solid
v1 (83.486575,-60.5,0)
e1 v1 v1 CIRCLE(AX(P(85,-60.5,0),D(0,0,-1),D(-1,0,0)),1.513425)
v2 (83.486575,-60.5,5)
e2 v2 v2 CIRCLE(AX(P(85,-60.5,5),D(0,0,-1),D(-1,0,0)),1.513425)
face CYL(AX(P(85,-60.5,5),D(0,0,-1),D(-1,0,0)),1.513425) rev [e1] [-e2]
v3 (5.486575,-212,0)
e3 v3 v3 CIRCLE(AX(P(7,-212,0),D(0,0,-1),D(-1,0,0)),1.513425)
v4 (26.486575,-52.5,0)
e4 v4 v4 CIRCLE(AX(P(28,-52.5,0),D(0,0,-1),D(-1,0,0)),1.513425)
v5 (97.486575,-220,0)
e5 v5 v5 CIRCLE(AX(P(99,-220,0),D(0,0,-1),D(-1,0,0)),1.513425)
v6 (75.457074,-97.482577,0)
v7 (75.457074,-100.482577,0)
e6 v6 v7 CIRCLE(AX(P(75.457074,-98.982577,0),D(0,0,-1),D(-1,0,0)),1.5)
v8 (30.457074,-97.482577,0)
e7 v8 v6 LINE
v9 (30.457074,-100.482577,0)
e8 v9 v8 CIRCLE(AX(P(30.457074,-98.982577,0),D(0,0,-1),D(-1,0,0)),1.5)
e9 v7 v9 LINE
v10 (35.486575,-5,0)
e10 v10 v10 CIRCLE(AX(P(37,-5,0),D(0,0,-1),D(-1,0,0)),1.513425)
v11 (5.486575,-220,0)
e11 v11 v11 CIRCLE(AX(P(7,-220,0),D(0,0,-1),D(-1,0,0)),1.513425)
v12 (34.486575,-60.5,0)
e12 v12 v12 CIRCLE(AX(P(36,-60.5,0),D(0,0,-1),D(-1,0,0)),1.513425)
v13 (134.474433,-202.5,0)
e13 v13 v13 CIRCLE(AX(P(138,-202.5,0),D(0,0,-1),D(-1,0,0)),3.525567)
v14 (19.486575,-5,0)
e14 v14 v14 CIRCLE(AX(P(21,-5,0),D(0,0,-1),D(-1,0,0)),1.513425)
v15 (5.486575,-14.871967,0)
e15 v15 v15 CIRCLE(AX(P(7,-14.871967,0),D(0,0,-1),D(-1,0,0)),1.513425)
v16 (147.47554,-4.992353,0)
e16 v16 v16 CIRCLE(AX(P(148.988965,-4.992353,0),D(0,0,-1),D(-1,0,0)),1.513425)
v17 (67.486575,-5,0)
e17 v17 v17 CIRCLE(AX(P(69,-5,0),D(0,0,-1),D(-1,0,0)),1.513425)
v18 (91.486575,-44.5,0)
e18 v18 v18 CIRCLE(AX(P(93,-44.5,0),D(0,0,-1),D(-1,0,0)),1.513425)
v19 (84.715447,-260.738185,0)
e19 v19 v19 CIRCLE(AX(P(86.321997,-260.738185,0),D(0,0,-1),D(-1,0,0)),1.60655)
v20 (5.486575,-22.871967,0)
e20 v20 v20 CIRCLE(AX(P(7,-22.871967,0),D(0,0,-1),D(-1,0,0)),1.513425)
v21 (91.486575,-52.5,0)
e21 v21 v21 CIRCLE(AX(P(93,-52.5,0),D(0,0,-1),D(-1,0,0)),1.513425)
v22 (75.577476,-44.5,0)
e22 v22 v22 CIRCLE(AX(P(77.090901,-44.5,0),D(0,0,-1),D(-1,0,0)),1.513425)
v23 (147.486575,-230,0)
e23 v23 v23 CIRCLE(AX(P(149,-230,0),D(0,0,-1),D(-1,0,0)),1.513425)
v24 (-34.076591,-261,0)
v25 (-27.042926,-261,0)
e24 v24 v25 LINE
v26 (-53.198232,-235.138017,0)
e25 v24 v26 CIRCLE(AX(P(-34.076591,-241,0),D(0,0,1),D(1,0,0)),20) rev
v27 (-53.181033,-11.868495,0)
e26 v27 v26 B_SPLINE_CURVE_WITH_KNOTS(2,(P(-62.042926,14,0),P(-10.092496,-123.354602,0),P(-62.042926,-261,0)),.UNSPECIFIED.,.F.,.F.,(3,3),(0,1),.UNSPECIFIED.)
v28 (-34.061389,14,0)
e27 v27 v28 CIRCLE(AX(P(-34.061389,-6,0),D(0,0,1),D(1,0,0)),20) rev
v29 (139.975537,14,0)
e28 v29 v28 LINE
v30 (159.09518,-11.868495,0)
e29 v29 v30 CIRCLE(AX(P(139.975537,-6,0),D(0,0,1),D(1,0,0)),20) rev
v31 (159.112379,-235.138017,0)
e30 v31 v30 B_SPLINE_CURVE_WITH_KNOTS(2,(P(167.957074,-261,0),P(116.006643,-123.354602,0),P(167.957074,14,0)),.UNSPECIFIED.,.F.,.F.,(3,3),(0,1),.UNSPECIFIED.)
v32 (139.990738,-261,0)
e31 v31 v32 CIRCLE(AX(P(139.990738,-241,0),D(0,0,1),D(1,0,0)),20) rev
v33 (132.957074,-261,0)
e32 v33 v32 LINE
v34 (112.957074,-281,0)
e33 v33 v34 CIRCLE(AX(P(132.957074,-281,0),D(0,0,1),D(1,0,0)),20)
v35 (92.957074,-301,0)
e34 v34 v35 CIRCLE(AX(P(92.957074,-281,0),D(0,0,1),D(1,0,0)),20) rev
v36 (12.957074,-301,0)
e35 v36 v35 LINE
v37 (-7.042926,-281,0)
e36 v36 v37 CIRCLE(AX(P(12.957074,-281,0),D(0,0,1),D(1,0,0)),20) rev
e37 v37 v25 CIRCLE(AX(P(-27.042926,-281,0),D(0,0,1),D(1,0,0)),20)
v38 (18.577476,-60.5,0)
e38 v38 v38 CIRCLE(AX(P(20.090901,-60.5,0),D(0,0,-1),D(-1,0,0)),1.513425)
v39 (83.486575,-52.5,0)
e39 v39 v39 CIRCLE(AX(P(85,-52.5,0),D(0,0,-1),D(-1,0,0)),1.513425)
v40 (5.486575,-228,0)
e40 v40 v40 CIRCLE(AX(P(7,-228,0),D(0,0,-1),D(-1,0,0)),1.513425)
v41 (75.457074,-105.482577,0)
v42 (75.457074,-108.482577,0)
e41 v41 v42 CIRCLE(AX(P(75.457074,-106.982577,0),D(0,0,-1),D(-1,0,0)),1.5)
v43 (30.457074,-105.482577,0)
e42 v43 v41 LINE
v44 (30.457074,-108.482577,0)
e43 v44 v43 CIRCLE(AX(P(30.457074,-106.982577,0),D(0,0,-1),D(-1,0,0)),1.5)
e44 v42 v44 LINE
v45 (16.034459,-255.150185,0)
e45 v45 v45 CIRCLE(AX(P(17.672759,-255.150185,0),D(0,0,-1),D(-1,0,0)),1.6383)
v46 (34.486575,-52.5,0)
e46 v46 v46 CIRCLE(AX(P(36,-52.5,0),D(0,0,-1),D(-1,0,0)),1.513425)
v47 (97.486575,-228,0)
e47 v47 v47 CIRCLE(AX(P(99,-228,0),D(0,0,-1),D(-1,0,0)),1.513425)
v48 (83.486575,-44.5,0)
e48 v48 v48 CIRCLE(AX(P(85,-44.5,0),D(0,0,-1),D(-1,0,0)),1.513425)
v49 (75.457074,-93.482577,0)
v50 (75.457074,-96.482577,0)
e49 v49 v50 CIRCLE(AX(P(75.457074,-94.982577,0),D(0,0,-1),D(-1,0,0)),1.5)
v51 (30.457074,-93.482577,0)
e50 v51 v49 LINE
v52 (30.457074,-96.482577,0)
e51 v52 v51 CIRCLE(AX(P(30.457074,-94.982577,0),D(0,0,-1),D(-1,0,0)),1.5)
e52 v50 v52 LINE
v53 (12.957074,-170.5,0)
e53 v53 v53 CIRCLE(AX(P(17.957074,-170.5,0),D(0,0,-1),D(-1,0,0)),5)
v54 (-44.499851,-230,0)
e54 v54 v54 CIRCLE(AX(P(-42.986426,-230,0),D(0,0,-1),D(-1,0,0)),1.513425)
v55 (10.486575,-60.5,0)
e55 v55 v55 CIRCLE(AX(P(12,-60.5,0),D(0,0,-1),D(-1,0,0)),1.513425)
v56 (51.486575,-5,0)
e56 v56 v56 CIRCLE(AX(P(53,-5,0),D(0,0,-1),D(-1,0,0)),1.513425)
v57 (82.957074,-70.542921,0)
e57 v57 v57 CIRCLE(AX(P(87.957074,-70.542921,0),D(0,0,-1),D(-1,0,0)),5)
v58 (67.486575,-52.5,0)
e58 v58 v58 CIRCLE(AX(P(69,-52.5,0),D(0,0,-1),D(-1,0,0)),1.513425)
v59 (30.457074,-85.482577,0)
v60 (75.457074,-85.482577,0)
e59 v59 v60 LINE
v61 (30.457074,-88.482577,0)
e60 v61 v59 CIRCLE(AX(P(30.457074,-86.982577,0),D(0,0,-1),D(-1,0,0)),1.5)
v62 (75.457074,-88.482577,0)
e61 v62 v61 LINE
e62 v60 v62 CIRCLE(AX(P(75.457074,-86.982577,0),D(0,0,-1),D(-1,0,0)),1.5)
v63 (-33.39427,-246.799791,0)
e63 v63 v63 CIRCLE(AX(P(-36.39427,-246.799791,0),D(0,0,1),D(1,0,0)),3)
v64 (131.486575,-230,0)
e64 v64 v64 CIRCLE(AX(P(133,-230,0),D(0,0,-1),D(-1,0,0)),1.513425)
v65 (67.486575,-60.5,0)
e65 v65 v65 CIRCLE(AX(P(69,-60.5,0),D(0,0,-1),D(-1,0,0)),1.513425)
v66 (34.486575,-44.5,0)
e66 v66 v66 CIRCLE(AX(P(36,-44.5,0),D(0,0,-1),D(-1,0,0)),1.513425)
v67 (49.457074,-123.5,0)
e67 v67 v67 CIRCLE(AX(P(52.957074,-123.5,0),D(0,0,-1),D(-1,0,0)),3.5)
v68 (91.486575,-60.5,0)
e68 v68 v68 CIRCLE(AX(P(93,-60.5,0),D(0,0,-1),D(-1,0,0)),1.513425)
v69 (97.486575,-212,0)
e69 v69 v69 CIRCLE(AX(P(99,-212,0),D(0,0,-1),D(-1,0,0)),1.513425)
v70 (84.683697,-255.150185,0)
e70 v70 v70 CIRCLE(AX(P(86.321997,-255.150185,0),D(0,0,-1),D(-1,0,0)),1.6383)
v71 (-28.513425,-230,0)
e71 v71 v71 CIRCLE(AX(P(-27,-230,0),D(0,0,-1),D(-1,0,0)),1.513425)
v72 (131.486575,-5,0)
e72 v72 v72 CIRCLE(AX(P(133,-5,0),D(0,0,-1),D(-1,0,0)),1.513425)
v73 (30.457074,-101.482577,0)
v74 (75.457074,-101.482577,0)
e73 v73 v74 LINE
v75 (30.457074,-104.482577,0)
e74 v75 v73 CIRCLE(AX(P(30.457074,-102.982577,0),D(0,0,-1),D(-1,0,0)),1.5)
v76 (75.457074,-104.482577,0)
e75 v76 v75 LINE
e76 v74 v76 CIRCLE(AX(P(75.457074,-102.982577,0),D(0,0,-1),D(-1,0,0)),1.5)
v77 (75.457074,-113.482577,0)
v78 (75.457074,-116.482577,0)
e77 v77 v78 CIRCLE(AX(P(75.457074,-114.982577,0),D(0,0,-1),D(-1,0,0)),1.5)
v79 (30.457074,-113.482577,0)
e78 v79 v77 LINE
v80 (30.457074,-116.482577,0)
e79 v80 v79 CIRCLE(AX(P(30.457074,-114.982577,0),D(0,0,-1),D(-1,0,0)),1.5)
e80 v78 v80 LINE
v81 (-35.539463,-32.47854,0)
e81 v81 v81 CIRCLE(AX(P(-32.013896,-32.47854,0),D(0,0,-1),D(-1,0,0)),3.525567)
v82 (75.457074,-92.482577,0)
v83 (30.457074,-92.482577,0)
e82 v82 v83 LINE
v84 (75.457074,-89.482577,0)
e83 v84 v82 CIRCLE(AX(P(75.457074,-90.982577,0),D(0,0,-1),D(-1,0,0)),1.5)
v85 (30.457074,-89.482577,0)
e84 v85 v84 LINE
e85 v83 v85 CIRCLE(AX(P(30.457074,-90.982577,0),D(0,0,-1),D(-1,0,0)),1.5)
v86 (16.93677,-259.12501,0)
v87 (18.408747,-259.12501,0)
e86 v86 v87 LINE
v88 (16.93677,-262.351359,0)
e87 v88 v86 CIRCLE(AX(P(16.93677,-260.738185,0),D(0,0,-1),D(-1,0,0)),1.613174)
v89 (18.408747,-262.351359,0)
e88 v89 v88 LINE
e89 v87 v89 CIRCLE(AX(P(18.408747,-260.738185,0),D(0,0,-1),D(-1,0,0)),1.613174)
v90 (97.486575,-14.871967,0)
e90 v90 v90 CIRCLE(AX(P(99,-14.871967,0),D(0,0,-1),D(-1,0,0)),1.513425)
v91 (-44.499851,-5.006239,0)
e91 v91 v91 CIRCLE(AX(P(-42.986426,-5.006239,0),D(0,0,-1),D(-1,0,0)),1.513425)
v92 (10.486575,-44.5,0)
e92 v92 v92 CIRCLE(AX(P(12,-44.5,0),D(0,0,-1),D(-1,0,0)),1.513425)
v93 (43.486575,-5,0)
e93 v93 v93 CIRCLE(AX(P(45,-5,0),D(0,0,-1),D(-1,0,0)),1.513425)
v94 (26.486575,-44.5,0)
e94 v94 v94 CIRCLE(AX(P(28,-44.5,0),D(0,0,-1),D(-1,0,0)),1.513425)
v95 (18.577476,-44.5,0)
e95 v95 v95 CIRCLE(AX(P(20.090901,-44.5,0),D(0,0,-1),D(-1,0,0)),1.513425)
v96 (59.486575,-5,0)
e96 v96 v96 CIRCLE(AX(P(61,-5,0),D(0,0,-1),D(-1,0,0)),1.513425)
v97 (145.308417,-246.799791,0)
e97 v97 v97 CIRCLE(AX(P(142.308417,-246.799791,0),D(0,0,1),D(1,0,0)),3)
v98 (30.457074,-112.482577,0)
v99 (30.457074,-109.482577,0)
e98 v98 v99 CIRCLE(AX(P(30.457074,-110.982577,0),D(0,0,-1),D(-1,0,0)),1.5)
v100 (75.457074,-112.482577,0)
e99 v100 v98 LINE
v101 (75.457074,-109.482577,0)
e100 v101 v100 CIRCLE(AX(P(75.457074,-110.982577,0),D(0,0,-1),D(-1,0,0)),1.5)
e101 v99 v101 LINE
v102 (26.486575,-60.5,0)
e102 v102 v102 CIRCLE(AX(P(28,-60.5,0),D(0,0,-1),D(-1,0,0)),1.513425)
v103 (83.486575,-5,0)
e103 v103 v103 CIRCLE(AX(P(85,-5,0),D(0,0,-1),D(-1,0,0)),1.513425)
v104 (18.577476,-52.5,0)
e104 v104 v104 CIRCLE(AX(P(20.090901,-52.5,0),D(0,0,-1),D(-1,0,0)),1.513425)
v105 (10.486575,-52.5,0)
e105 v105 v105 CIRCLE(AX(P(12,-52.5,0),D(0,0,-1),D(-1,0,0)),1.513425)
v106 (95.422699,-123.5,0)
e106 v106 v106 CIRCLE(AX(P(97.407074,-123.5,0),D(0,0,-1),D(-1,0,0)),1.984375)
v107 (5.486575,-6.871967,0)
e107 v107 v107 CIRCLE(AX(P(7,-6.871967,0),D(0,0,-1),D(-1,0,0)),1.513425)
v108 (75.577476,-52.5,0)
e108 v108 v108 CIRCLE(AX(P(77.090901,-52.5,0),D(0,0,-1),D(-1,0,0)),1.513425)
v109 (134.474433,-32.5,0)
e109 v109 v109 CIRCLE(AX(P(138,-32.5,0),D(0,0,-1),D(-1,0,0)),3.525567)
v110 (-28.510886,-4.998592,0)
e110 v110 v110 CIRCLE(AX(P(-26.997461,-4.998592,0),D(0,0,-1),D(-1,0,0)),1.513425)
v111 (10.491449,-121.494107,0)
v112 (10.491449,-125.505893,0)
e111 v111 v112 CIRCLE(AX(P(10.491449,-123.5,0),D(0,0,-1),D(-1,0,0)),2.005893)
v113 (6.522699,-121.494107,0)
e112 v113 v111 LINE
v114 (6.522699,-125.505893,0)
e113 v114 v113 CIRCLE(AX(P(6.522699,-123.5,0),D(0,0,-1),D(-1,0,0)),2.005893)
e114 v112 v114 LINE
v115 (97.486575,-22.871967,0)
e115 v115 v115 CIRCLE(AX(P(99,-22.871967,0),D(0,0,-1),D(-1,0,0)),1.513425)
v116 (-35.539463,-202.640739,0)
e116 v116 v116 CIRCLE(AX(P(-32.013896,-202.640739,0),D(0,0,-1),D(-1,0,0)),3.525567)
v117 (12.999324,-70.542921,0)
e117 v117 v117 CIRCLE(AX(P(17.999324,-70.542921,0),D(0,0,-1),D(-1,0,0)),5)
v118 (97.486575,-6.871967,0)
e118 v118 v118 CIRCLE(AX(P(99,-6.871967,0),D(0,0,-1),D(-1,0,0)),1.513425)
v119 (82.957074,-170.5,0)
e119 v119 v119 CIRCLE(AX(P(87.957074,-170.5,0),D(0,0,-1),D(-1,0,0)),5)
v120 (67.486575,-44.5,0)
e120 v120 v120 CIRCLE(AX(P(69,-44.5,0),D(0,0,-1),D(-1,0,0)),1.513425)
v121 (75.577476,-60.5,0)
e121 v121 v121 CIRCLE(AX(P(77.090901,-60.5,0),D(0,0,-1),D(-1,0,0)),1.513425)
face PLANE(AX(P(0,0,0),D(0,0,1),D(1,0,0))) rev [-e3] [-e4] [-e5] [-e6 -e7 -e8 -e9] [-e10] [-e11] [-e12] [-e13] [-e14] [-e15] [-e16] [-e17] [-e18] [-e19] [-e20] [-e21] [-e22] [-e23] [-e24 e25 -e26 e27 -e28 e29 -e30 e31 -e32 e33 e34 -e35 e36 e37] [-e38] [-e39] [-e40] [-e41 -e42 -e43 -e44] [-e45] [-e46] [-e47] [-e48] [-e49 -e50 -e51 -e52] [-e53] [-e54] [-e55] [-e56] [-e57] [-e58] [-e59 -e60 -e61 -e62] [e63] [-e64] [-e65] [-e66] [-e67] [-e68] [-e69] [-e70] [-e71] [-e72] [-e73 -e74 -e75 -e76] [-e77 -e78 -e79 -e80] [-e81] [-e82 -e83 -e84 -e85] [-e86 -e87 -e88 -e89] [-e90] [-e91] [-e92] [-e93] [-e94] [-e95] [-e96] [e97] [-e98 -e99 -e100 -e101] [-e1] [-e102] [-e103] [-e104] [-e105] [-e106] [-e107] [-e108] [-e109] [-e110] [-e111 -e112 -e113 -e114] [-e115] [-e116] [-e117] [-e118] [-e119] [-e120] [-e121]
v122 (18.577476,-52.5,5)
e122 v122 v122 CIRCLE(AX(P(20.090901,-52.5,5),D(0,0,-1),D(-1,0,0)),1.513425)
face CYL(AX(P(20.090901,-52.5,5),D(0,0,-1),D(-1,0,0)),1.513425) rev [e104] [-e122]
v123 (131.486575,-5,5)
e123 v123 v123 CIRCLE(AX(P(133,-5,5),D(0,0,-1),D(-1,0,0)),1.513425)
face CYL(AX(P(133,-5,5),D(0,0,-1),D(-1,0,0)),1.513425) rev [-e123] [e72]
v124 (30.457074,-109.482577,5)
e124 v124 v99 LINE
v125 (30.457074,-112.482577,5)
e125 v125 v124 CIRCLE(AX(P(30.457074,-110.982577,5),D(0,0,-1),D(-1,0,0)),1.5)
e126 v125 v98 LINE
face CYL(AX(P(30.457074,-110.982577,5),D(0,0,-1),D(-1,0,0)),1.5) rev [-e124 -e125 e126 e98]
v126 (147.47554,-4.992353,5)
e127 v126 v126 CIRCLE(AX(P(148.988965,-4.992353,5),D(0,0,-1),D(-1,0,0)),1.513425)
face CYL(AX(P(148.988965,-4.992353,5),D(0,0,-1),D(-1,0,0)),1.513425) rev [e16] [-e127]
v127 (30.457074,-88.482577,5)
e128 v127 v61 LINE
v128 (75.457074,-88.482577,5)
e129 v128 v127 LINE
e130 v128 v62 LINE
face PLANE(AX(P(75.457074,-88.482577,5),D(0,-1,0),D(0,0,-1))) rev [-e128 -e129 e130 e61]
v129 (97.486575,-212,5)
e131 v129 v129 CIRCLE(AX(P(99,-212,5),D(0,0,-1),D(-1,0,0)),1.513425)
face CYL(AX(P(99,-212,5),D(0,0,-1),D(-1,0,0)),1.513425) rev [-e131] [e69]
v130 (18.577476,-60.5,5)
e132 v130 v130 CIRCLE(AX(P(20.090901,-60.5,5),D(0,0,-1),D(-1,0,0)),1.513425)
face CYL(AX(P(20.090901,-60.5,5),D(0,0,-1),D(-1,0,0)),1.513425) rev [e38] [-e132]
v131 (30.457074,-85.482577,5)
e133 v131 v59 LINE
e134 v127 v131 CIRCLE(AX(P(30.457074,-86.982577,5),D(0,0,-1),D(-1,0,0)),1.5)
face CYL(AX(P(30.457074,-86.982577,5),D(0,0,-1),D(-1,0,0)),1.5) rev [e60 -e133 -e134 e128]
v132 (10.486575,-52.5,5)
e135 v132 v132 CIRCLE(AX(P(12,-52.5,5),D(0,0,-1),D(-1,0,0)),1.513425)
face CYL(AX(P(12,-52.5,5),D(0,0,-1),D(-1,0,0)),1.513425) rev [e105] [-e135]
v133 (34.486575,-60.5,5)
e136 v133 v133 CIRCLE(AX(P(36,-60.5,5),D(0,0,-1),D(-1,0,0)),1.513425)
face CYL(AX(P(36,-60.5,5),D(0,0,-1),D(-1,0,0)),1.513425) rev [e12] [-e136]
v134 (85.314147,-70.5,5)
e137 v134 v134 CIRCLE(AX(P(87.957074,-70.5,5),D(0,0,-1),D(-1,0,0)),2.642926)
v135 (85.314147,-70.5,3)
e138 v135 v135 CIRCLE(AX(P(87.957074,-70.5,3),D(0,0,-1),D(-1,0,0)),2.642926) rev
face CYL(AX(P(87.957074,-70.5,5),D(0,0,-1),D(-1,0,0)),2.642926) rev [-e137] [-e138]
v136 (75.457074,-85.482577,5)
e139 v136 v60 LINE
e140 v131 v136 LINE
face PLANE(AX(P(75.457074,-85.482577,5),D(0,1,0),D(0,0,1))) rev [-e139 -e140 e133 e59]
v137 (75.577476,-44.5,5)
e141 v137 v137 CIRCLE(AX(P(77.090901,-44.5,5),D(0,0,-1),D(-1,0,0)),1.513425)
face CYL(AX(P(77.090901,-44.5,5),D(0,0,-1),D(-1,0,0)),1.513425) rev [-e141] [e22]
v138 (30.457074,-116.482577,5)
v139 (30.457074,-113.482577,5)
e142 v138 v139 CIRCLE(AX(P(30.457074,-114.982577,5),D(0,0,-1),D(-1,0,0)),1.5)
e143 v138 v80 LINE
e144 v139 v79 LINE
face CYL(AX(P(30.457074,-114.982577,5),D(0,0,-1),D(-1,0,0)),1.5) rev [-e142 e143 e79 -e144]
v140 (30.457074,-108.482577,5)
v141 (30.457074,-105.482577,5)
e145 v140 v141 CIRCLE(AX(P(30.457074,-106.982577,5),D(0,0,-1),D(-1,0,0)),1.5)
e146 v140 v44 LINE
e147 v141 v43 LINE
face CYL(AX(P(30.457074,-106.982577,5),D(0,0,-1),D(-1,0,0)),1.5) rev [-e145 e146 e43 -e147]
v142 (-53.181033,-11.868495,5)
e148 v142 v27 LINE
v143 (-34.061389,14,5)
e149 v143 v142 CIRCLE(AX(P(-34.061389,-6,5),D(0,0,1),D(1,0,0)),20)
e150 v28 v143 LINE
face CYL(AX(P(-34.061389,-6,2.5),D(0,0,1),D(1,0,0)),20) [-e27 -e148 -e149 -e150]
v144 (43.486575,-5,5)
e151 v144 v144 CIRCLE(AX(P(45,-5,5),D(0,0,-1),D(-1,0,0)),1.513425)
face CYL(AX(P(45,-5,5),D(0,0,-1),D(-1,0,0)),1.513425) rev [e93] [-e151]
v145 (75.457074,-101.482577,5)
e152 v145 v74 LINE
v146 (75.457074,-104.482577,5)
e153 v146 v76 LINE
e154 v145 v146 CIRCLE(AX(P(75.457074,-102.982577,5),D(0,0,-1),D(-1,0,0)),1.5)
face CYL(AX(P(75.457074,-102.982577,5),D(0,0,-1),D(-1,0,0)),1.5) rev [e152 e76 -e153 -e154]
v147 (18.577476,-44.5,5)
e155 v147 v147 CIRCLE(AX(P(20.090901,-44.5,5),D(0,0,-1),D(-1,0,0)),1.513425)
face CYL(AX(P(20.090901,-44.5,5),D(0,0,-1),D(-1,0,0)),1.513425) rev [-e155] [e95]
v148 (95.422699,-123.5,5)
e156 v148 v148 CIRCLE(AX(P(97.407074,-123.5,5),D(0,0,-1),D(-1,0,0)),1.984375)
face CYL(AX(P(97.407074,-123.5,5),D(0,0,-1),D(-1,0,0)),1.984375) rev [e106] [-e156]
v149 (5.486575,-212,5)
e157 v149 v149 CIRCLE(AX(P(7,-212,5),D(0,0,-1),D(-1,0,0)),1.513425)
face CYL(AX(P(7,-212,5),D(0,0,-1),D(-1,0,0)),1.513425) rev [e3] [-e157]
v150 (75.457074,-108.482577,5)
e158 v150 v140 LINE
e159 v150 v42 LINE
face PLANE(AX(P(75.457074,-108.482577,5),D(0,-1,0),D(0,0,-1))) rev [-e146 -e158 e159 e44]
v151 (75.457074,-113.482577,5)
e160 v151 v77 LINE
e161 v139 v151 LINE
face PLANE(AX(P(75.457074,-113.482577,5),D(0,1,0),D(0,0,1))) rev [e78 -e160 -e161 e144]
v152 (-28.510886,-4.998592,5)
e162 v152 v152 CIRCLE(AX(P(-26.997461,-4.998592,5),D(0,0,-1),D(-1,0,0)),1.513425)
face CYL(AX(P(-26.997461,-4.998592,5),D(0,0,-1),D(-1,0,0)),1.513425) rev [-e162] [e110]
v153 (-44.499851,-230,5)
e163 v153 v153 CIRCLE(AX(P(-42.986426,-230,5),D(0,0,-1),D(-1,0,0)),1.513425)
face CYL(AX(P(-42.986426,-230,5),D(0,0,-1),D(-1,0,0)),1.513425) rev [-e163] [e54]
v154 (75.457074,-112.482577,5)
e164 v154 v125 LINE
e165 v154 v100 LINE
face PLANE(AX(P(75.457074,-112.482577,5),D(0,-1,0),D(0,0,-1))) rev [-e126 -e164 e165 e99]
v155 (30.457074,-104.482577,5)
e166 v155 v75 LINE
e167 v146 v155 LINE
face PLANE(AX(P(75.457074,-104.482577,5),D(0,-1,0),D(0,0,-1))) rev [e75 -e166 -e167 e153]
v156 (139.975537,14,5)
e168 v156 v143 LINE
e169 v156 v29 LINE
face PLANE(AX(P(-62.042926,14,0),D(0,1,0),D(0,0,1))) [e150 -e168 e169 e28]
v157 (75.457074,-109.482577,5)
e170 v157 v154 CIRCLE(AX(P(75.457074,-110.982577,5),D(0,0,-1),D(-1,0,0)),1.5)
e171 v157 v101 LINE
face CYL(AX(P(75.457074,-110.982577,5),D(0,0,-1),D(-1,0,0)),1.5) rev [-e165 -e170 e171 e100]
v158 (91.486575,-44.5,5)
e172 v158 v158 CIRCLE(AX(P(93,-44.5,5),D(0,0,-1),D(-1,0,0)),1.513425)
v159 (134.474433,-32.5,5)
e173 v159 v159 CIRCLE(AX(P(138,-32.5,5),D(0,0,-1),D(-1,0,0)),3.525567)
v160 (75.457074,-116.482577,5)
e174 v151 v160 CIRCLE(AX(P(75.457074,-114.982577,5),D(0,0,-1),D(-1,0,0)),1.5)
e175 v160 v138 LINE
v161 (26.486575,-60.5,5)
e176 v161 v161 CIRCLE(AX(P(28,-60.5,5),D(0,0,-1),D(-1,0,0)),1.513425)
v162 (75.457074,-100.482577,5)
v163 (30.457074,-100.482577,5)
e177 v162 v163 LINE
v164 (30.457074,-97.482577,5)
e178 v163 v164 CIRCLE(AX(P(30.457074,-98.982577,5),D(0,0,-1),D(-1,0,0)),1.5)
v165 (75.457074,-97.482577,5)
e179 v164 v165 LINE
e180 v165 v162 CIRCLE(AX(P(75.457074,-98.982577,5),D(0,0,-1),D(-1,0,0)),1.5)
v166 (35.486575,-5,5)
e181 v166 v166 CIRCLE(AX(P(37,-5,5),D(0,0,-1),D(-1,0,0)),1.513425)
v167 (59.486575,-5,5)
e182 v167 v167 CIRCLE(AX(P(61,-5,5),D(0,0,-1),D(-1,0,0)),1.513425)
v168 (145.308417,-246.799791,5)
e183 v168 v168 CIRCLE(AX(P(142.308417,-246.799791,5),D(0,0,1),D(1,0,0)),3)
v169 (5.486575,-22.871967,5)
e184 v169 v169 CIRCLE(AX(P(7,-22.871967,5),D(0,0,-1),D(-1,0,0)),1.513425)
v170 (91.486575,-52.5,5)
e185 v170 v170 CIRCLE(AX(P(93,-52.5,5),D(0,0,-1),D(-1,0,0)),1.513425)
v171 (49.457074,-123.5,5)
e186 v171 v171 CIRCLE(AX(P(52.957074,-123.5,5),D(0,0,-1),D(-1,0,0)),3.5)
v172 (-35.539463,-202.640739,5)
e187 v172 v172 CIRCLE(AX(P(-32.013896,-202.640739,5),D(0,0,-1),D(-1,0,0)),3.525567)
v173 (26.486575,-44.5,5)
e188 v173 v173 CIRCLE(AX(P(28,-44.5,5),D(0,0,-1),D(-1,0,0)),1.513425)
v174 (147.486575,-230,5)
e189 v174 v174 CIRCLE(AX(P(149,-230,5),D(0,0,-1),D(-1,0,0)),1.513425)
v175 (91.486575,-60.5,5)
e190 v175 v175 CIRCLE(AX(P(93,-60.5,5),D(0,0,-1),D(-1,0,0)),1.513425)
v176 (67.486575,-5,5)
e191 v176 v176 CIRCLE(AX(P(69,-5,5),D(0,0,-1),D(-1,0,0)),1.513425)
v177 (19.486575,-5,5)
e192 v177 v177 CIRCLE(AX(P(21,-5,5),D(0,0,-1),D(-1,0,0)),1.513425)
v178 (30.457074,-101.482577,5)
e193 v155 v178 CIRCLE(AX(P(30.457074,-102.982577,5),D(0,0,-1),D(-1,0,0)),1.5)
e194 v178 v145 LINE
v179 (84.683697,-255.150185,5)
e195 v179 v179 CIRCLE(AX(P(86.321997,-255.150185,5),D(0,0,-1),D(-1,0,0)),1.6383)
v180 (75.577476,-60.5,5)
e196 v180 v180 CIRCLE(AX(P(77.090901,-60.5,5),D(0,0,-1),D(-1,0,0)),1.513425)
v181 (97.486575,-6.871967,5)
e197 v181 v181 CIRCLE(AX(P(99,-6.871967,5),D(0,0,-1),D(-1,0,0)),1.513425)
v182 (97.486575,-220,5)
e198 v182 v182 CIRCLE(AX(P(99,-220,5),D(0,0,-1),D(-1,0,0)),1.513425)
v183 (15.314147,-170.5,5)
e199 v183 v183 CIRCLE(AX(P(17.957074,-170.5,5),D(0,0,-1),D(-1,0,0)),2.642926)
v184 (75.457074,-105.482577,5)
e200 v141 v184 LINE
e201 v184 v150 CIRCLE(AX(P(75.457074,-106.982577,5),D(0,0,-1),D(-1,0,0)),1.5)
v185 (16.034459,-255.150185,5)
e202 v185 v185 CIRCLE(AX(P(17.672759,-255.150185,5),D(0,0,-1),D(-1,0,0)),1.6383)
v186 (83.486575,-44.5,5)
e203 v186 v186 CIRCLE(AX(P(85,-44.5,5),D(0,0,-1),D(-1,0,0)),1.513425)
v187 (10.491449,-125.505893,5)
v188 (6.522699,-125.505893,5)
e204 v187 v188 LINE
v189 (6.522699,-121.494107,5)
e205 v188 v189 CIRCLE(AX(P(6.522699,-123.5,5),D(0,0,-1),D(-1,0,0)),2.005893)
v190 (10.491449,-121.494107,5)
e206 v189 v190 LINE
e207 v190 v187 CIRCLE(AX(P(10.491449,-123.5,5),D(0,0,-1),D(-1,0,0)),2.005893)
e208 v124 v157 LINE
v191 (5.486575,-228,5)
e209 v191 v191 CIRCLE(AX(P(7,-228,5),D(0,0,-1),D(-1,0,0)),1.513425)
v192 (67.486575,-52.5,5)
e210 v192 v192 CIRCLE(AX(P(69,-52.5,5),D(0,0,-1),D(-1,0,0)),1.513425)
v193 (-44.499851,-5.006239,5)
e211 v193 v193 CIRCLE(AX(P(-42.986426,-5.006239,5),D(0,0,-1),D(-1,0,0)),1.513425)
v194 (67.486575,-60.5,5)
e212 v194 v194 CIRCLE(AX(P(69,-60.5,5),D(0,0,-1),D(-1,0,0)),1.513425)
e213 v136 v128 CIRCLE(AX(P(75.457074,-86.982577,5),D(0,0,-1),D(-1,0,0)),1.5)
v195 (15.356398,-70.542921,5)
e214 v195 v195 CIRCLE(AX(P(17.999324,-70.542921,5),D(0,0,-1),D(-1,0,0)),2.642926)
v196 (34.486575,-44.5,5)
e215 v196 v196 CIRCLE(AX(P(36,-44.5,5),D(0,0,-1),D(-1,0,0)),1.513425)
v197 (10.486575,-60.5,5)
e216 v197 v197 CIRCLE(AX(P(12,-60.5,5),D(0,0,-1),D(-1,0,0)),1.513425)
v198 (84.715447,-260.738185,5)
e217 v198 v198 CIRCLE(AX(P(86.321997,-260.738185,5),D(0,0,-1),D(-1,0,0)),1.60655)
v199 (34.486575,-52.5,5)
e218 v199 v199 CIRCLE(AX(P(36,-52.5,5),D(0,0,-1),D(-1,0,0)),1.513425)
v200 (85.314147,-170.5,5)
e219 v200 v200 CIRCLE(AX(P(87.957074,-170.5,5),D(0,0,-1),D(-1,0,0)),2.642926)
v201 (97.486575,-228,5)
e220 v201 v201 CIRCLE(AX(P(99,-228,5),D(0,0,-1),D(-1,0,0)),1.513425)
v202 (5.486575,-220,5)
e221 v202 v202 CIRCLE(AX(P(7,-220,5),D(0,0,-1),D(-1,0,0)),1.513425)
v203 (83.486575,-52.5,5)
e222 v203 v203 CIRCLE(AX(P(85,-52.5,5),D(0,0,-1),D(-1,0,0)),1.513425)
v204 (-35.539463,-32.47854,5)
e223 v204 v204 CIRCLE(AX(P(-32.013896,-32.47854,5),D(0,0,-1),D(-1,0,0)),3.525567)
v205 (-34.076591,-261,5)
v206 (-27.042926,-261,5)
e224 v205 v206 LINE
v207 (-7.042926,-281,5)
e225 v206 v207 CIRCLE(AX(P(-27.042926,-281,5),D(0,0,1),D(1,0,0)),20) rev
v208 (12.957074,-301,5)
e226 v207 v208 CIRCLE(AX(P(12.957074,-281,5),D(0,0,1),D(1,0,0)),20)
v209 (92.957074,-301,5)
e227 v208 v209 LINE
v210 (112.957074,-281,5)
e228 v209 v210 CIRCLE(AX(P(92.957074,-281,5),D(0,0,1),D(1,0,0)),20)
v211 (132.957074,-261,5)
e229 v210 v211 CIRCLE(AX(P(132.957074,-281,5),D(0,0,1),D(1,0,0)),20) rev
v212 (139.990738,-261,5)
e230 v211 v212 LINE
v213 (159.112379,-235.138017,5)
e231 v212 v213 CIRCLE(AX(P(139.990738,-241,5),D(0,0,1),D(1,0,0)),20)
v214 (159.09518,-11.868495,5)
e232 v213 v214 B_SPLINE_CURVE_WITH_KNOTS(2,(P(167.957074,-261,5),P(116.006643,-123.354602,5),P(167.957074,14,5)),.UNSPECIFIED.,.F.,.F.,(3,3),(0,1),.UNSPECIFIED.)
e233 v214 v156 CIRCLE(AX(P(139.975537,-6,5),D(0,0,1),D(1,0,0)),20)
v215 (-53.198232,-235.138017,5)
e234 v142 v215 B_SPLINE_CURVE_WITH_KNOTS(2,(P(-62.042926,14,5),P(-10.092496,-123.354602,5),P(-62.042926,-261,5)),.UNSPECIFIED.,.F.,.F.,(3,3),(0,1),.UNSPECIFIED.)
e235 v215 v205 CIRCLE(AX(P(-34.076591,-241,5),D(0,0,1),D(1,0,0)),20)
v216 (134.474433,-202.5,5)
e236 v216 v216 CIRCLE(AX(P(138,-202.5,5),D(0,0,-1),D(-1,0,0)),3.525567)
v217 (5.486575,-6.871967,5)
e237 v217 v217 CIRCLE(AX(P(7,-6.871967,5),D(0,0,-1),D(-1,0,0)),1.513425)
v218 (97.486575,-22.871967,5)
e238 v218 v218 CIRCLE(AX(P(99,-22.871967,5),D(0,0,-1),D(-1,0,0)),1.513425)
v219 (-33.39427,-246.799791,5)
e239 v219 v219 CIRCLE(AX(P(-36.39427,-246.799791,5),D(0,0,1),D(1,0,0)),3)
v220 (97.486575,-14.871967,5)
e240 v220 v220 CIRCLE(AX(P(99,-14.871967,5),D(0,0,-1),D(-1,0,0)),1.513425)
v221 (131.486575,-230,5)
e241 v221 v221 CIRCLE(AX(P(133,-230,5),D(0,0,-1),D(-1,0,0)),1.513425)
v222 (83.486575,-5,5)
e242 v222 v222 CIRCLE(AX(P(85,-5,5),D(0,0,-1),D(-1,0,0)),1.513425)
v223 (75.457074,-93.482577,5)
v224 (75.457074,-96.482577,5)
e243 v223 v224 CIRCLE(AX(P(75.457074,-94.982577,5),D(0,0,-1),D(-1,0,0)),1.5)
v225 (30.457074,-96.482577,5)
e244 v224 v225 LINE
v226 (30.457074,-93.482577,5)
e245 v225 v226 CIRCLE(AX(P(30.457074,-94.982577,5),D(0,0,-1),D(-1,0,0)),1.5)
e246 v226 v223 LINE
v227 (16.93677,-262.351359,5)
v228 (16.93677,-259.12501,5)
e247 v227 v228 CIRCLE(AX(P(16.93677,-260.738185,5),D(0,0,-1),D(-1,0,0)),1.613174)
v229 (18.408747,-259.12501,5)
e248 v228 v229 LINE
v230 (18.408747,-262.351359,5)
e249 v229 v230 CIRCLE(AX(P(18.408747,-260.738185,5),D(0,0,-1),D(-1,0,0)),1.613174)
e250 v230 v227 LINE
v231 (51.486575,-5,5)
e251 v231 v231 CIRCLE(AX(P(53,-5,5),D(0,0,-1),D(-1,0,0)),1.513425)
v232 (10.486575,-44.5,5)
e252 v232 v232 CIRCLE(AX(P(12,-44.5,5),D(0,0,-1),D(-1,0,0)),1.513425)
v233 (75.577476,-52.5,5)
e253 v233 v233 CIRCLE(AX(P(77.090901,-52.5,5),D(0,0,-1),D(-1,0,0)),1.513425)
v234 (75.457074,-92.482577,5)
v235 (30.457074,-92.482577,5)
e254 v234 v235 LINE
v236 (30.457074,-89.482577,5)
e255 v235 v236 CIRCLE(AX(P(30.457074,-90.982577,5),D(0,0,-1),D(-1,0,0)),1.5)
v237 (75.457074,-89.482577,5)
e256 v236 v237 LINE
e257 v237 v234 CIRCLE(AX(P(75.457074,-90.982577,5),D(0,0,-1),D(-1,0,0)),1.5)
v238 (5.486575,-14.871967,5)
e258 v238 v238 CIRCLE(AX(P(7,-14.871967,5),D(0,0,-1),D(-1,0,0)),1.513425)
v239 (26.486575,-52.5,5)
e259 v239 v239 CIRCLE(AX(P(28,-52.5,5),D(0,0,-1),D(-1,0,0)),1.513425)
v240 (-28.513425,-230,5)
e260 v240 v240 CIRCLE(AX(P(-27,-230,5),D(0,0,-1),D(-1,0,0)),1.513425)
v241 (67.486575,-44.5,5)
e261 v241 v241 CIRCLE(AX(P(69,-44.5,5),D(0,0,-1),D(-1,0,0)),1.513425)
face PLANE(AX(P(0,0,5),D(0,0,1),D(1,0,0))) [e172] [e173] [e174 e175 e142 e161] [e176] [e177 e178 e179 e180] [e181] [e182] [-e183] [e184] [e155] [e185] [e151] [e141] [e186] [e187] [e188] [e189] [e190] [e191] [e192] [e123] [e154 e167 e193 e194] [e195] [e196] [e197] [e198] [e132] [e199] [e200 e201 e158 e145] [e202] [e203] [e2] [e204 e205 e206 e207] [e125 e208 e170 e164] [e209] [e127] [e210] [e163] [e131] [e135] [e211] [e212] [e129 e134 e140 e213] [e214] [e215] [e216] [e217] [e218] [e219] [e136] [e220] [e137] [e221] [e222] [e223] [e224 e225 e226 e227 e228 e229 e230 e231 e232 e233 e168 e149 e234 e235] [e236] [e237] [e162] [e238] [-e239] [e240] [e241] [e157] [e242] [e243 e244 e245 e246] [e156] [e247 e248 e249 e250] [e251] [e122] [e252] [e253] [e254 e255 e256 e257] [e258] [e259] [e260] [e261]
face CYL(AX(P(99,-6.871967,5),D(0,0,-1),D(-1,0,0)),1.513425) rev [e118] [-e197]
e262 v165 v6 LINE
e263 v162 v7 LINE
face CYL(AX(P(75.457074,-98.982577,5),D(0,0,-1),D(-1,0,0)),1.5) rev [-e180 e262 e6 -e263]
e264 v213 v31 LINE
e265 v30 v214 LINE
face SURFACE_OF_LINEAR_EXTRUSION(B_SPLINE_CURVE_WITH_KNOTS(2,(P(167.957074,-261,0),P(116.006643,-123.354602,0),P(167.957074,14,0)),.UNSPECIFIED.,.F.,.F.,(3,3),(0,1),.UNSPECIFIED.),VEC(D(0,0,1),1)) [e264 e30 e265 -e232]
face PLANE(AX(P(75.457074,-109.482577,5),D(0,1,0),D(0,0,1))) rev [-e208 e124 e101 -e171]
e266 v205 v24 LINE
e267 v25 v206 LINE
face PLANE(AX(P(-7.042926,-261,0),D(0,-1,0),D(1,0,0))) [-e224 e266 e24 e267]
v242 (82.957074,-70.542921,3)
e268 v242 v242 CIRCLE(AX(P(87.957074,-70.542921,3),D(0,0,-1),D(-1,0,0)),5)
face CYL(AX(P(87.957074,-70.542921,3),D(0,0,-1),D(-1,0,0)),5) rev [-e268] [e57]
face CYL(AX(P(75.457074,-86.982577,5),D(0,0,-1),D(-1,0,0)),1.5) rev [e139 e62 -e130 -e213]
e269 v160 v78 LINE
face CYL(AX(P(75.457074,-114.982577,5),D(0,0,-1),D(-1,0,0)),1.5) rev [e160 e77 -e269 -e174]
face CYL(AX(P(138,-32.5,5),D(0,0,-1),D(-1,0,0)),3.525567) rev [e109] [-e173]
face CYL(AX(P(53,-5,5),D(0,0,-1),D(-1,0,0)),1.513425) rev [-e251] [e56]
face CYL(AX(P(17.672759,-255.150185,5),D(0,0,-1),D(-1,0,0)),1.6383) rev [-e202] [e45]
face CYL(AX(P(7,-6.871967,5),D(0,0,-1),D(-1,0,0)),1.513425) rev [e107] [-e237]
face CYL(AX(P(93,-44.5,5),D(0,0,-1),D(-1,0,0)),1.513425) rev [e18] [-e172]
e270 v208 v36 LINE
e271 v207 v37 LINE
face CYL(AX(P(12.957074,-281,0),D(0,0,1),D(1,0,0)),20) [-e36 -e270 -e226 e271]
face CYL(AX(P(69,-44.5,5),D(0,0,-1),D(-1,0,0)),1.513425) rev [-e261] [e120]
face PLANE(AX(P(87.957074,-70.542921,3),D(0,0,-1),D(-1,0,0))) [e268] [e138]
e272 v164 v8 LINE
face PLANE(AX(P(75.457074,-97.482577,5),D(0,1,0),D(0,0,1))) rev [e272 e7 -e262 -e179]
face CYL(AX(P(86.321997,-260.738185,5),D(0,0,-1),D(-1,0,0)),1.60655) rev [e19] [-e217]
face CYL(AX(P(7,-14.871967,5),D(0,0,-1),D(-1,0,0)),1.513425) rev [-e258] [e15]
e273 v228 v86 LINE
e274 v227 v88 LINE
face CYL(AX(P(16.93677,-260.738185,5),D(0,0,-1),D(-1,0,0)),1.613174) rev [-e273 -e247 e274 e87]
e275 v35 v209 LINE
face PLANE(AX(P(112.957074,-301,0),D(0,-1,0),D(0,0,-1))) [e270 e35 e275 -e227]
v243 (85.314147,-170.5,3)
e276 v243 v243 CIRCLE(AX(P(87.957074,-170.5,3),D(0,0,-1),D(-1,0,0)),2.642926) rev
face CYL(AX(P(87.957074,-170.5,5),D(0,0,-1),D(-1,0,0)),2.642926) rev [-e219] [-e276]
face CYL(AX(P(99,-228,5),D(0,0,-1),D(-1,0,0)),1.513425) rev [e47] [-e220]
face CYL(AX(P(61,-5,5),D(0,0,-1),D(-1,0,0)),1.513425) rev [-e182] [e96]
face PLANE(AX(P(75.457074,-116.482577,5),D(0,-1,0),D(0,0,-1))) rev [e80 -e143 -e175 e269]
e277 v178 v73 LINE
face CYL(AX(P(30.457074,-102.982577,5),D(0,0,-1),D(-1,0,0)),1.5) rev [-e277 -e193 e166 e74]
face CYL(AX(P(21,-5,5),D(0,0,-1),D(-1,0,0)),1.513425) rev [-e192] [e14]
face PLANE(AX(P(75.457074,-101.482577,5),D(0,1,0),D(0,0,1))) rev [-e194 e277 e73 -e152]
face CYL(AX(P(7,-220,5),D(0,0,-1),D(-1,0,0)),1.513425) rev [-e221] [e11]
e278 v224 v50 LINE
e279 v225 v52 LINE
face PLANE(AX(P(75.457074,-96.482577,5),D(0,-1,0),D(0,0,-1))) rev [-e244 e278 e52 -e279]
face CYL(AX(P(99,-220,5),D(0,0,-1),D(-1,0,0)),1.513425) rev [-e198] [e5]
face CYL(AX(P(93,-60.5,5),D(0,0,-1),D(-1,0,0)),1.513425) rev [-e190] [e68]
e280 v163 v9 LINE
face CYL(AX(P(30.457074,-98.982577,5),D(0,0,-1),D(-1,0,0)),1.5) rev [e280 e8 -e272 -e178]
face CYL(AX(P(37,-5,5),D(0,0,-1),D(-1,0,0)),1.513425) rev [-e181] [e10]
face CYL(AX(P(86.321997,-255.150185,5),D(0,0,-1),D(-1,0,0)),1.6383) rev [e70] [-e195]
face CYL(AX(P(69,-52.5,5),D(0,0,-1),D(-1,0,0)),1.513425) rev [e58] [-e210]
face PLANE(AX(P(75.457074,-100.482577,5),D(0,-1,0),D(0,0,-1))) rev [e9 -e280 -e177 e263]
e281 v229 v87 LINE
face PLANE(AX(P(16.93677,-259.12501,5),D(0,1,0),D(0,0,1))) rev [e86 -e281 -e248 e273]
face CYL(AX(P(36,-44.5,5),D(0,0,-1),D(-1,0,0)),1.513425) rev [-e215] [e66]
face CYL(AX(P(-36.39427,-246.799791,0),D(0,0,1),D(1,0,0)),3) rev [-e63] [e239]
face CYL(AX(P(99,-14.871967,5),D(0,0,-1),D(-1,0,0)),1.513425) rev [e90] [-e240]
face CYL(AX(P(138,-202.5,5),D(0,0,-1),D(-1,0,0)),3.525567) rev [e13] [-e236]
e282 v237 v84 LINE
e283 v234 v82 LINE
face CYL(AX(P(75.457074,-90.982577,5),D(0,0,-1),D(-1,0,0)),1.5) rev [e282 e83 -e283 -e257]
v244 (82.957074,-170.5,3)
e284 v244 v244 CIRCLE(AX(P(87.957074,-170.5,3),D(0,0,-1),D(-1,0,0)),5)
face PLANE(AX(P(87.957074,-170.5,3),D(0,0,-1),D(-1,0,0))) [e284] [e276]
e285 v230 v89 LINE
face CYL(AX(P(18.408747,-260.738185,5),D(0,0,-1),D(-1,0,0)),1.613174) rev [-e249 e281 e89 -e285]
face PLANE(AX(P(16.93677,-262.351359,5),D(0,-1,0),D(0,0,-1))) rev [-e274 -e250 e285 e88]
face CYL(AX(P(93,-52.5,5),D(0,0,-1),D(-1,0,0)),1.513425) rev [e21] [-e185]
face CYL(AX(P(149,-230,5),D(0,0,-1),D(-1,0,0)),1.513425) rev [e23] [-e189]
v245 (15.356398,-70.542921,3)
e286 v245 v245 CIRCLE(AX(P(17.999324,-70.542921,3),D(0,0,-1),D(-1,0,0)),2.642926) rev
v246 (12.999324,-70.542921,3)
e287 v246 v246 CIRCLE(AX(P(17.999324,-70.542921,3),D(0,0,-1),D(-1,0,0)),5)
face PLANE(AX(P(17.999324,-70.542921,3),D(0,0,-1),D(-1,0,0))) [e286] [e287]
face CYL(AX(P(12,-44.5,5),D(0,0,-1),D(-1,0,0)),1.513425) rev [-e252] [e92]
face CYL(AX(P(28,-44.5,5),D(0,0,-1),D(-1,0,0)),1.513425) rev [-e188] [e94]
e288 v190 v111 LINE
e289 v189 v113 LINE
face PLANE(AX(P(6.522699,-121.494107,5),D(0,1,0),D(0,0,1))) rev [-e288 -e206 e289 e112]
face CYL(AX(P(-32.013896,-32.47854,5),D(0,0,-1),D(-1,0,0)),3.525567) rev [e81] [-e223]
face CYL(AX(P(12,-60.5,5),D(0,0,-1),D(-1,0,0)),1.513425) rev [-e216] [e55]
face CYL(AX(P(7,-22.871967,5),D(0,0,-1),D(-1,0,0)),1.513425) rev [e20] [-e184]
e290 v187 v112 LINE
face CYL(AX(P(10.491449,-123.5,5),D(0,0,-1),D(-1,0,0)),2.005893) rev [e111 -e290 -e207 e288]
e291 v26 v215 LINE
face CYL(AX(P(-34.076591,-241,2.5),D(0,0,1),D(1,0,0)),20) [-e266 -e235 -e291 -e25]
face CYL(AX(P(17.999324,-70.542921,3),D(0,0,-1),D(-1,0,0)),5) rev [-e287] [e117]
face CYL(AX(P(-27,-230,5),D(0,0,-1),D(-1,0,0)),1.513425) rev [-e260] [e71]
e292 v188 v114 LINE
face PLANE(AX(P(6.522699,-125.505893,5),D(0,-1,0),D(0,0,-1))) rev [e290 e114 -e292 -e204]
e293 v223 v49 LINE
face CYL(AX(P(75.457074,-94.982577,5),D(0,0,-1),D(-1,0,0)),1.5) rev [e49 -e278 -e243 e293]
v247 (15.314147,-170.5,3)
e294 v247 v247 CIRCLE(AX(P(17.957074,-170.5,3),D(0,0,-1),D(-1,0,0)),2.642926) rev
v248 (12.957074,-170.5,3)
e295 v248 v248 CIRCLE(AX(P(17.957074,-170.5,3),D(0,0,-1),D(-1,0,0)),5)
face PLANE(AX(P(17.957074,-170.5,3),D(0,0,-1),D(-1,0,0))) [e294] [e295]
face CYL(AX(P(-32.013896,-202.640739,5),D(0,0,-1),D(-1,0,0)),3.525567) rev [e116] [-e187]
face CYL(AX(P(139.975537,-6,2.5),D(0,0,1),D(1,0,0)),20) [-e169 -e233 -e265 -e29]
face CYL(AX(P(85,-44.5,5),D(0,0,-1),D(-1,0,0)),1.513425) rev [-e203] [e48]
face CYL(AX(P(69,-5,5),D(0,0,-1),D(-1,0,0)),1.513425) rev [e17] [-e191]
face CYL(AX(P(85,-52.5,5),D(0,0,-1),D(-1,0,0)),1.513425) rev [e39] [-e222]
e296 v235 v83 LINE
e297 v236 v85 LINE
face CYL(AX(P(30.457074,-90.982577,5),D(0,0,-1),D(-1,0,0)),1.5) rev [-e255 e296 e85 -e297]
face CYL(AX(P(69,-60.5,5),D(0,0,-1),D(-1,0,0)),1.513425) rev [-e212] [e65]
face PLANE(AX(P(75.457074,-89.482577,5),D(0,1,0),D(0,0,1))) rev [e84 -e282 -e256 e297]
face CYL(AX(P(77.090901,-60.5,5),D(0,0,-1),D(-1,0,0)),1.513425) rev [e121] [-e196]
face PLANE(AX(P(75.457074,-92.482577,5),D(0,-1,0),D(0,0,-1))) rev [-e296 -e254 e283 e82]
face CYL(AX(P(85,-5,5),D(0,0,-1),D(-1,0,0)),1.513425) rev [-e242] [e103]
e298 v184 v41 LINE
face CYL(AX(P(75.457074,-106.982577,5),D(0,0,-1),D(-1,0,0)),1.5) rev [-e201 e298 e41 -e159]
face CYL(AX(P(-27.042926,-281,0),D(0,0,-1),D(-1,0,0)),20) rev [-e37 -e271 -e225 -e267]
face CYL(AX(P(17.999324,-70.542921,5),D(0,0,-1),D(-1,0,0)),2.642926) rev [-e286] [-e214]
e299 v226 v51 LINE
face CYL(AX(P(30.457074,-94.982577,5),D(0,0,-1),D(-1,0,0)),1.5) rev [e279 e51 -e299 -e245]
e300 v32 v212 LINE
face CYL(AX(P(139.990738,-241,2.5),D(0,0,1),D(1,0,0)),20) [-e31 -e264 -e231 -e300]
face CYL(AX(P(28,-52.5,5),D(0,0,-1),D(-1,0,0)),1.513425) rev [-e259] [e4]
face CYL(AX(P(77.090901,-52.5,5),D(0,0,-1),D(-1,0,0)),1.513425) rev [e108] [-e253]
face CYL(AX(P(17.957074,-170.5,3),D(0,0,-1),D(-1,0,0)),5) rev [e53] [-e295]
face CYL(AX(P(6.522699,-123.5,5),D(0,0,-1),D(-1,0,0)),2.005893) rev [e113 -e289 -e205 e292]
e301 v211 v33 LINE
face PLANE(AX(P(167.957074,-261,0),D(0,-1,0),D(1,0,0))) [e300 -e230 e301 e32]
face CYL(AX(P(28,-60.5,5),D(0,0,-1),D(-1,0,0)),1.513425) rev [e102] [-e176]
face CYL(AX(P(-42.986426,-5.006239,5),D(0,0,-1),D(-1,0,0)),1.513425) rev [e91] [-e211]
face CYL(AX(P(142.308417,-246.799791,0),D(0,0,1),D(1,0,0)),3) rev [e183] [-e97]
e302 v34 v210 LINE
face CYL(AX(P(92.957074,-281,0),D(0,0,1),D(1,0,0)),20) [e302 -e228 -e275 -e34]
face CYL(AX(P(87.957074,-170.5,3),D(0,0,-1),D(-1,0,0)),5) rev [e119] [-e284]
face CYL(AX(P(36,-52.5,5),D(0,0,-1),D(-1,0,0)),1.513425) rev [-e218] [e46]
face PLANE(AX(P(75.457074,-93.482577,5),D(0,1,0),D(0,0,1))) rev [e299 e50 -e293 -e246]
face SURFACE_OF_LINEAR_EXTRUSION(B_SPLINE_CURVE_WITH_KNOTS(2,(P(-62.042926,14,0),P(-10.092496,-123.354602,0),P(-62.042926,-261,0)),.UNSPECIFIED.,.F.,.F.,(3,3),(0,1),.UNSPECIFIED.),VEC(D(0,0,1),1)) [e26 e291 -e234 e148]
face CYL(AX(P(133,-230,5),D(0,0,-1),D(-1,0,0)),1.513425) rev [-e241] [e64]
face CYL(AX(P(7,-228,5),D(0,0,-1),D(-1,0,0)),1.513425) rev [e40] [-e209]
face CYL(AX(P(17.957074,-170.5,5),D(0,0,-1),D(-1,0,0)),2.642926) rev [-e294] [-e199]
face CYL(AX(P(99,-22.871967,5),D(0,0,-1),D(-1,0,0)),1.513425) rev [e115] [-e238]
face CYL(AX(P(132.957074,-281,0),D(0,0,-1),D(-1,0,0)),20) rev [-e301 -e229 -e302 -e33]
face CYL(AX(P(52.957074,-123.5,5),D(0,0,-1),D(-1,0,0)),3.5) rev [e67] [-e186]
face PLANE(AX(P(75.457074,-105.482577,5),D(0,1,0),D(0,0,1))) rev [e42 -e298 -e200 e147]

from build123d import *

# Parameters (mm, degrees)
SKETCH_1_W          = 333.133614648
SKETCH_1_H          = 408.025988762
EXTRUDE_1_DEPTH     = 5
SKETCH_2_R          = 1.513425055
SKETCH_2_R_2        = 3.525566515
SKETCH_2_R_3        = 2.642926273
SKETCH_2_R_4        = 3.5
SKETCH_2_R_5        = 1.6383
SKETCH_2_R_6        = 1.60655
SKETCH_2_R_7        = 1.984375
CUT_EXTRUDE_1_DEPTH = 390.365109421
SKETCH_3_R          = 5
CUT_EXTRUDE_2_DEPTH = 3
SKETCH_4_OUTSIDE_W  = 440.488
SKETCH_4_OUTSIDE_H  = 515.38
CUT_EXTRUDE_3_DEPTH = 390.365109421
FILLET_1_R          = 20
FILLET_2_R          = 20
CUT_EXTRUDE_4_DEPTH = 341.914998774
SKETCH_6_R          = 3
CUT_EXTRUDE_5_DEPTH = 341.914998774


with BuildPart() as part:
    # 草图1 → 凸台-拉伸1 (new body)
    with BuildSketch(Plane.XY):
        with Locations((53, -117.5)):
            Rectangle(SKETCH_1_W, SKETCH_1_H)
    extrude(amount=EXTRUDE_1_DEPTH)

    # 草图2 → 切除-拉伸1 (cut, through all)
    with BuildSketch(Plane(origin=(0, 0, 0), x_dir=(-1, 0, 0), z_dir=(0, 0, -1))):
        with Locations((-148.988965471, -4.992353349)):
            Circle(SKETCH_2_R)
        with Locations((-133, -5)):
            Circle(SKETCH_2_R)
        with Locations((26.997460535, -4.998592438)):
            Circle(SKETCH_2_R)
        with Locations((42.986426006, -5.00623909)):
            Circle(SKETCH_2_R)
        with Locations((-149, -230)):
            Circle(SKETCH_2_R)
        with Locations((-133, -230)):
            Circle(SKETCH_2_R)
        with Locations((27, -230)):
            Circle(SKETCH_2_R)
        with Locations((42.986426006, -230)):
            Circle(SKETCH_2_R)
        with Locations((-99, -212)):
            Circle(SKETCH_2_R)
        with Locations((-99, -220)):
            Circle(SKETCH_2_R)
        with Locations((-99, -228)):
            Circle(SKETCH_2_R)
        with Locations((-7, -228)):
            Circle(SKETCH_2_R)
        with Locations((-7, -212)):
            Circle(SKETCH_2_R)
        with Locations((-7, -220)):
            Circle(SKETCH_2_R)
        with Locations((-99, -6.871966514)):
            Circle(SKETCH_2_R)
        with Locations((-99, -14.871966514)):
            Circle(SKETCH_2_R)
        with Locations((-99, -22.871966514)):
            Circle(SKETCH_2_R)
        with Locations((-7, -22.871966514)):
            Circle(SKETCH_2_R)
        with Locations((-7, -6.871966514)):
            Circle(SKETCH_2_R)
        with Locations((-7, -14.871966514)):
            Circle(SKETCH_2_R)
        with Locations((-36, -60.5)):
            Circle(SKETCH_2_R)
        with Locations((-12, -44.5)):
            Circle(SKETCH_2_R)
        with Locations((-77.090901225, -52.5)):
            Circle(SKETCH_2_R)
        with Locations((-69, -60.5)):
            Circle(SKETCH_2_R)
        with Locations((-93, -44.5)):
            Circle(SKETCH_2_R)
        with Locations((-36, -44.5)):
            Circle(SKETCH_2_R)
        with Locations((-93, -60.5)):
            Circle(SKETCH_2_R)
        with Locations((-20.090901225, -44.5)):
            Circle(SKETCH_2_R)
        with Locations((-12, -60.5)):
            Circle(SKETCH_2_R)
        with Locations((-28, -52.5)):
            Circle(SKETCH_2_R)
        with Locations((-69, -44.5)):
            Circle(SKETCH_2_R)
        with Locations((-85, -60.5)):
            Circle(SKETCH_2_R)
        with Locations((-36, -52.5)):
            Circle(SKETCH_2_R)
        with Locations((-20.090901225, -52.5)):
            Circle(SKETCH_2_R)
        with Locations((-69, -52.5)):
            Circle(SKETCH_2_R)
        with Locations((-93, -52.5)):
            Circle(SKETCH_2_R)
        with Locations((-85, -44.5)):
            Circle(SKETCH_2_R)
        with Locations((-12, -52.5)):
            Circle(SKETCH_2_R)
        with Locations((-28, -44.5)):
            Circle(SKETCH_2_R)
        with Locations((-20.090901225, -60.5)):
            Circle(SKETCH_2_R)
        with Locations((-77.090901225, -44.5)):
            Circle(SKETCH_2_R)
        with Locations((-28, -60.5)):
            Circle(SKETCH_2_R)
        with Locations((-85, -52.5)):
            Circle(SKETCH_2_R)
        with Locations((-77.090901225, -60.5)):
            Circle(SKETCH_2_R)
        with Locations((-85, -5)):
            Circle(SKETCH_2_R)
        with Locations((-69, -5)):
            Circle(SKETCH_2_R)
        with Locations((-61, -5)):
            Circle(SKETCH_2_R)
        with Locations((-53, -5)):
            Circle(SKETCH_2_R)
        with Locations((-45, -5)):
            Circle(SKETCH_2_R)
        with Locations((-37, -5)):
            Circle(SKETCH_2_R)
        with Locations((-21, -5)):
            Circle(SKETCH_2_R)
        with Locations((32.013896377, -32.478539865)):
            Circle(SKETCH_2_R_2)
        with Locations((-138, -32.5)):
            Circle(SKETCH_2_R_2)
        with Locations((32.013896377, -202.640739345)):
            Circle(SKETCH_2_R_2)
        with Locations((-138, -202.5)):
            Circle(SKETCH_2_R_2)
        with Locations((-17.999324239, -70.542920954)):
            Circle(SKETCH_2_R_3)
        with Locations((-87.957073727, -70.5)):
            Circle(SKETCH_2_R_3)
        with Locations((-87.957073727, -170.5)):
            Circle(SKETCH_2_R_3)
        with Locations((-17.957073727, -170.5)):
            Circle(SKETCH_2_R_3)
        with Locations((-52.957073727, -123.5)):
            Circle(SKETCH_2_R_4)
        with Locations((-86.321996808, -255.150184677)):
            Circle(SKETCH_2_R_5)
        with Locations((-86.321996808, -260.738184677)):
            Circle(SKETCH_2_R_6)
        with Locations((-17.672758542, -255.150184677)):
            Circle(SKETCH_2_R_5)
        with Locations((-97.407073727, -123.5)):
            Circle(SKETCH_2_R_7)
        with BuildLine():
            Line((-16.936770276, -262.351358963), (-18.408746808, -262.351358963))
            ThreePointArc((-18.408746808, -262.351358963), (-20.021921094, -260.738184677), (-18.408746808, -259.125010391))
            Line((-18.408746808, -259.125010391), (-16.936770276, -259.125010391))
            ThreePointArc((-16.936770276, -259.125010391), (-15.32359599, -260.738184677), (-16.936770276, -262.351358963))
        make_face()
        with BuildLine():
            Line((-6.522698727, -125.505892513), (-10.491448727, -125.505892513))
            ThreePointArc((-10.491448727, -125.505892513), (-12.49734124, -123.5), (-10.491448727, -121.494107487))
            Line((-10.491448727, -121.494107487), (-6.522698727, -121.494107487))
            ThreePointArc((-6.522698727, -121.494107487), (-4.516806214, -123.5), (-6.522698727, -125.505892513))
        make_face()
    extrude(amount=-CUT_EXTRUDE_1_DEPTH, mode=Mode.SUBTRACT)

    # 草图3 → 切除-拉伸2 (cut)
    with BuildSketch(Plane(origin=(0, 0, 0), x_dir=(-1, 0, 0), z_dir=(0, 0, -1))):
        with Locations((-17.957073727, -170.5)):
            Circle(SKETCH_3_R)
        with Locations((-87.957073727, -170.5)):
            Circle(SKETCH_3_R)
        with Locations((-17.999324239, -70.542920954)):
            Circle(SKETCH_3_R)
        with Locations((-87.957073727, -70.542920954)):
            Circle(SKETCH_3_R)
    extrude(amount=-CUT_EXTRUDE_2_DEPTH, mode=Mode.SUBTRACT)

    # 草图4 outside → 切除-拉伸3 (cut, through all)
    with BuildSketch(Plane.XY.offset(5)):
        with Locations((53, -117.5)):
            Rectangle(SKETCH_4_OUTSIDE_W, SKETCH_4_OUTSIDE_H)
        with BuildLine():
            Line((167.957073727, -261), (112.957073727, -261))
            Line((112.957073727, -261), (112.957073727, -301))
            Line((112.957073727, -301), (-7.042926273, -301))
            Line((-7.042926273, -301), (-7.042926273, -261))
            Line((-7.042926273, -261), (-62.042926273, -261))
            add(Edge.make_bspline(
                [(-62.042926273, -261), (-10.092495878, -123.354602183), (-62.042926273, 14)],
                knots=[0, 0, 0, 1, 1, 1], degree=2))
            Line((-62.042926273, 14), (167.957073727, 14))
            add(Edge.make_bspline(
                [(167.957073727, -261), (116.006643332, -123.354602183), (167.957073727, 14)],
                knots=[0, 0, 0, 1, 1, 1], degree=2))
        make_face(mode=Mode.SUBTRACT)
    extrude(amount=-CUT_EXTRUDE_3_DEPTH, mode=Mode.SUBTRACT)

    # 圆角1
    fillet_1_edges = [part.edges().sort_by_distance(p)[0] for p in [
        (167.957073727, 14, 2.5),
        (-62.042926273, 14, 2.5),
        (-62.042926273, -261, 2.5),
        (167.957073727, -261, 2.5),
    ]]
    fillet(fillet_1_edges, radius=FILLET_1_R)

    # 圆角2
    # the kernel refuses this fillet: 20 mm, written as the material it adds along each edge
    with BuildSketch(Plane(origin=(-7.042926273, -261, 5), x_dir=(0, -1, 0), z_dir=(0, 0, -1)), Plane(origin=(112.957073727, -261, 5), x_dir=(1, 0, 0), z_dir=(0, 0, -1))) as fillet_2_piece_1:
        with BuildLine():
            CenterArc((FILLET_2_R, FILLET_2_R), FILLET_2_R, 180, 90)
            Line((0, FILLET_2_R), (-FILLET_2_R * 0.02, FILLET_2_R))
            Line((-FILLET_2_R * 0.02, FILLET_2_R), (-FILLET_2_R * 0.02, -FILLET_2_R * 0.02))
            Line((-FILLET_2_R * 0.02, -FILLET_2_R * 0.02), (FILLET_2_R, -FILLET_2_R * 0.02))
            Line((FILLET_2_R, -FILLET_2_R * 0.02), (FILLET_2_R, 0))
        make_face()
    extrude(amount=5)
    # the kernel refuses this fillet: 20 mm, written as the material it takes off along each edge
    with BuildSketch(Plane(origin=(-7.042926273, -301, 55), x_dir=(0, 1, 0), z_dir=(0, 0, -1)), Plane(origin=(112.957073727, -301, 55), x_dir=(-1, 0, 0), z_dir=(0, 0, -1))) as fillet_2_2_piece_1:
        with BuildLine():
            CenterArc((FILLET_2_R, FILLET_2_R), FILLET_2_R, 180, 90)
            Line((0, FILLET_2_R), (-FILLET_2_R * 0.02, FILLET_2_R))
            Line((-FILLET_2_R * 0.02, FILLET_2_R), (-FILLET_2_R * 0.02, -FILLET_2_R * 0.02))
            Line((-FILLET_2_R * 0.02, -FILLET_2_R * 0.02), (FILLET_2_R, -FILLET_2_R * 0.02))
            Line((FILLET_2_R, -FILLET_2_R * 0.02), (FILLET_2_R, 0))
        make_face()
    extrude(amount=105, mode=Mode.SUBTRACT)

    # 草图5 → 切除-拉伸4 (cut, through all)
    with BuildSketch(Plane(origin=(0, 0, 0), x_dir=(-1, 0, 0), z_dir=(0, 0, -1))):
        with BuildLine():
            Line((-75.457073727, -113.482576588), (-30.457073727, -113.482576588))
            ThreePointArc((-30.457073727, -113.482576588), (-28.957073727, -114.982576588), (-30.457073727, -116.482576588))
            Line((-30.457073727, -116.482576588), (-75.457073727, -116.482576588))
            ThreePointArc((-75.457073727, -116.482576588), (-76.957073727, -114.982576588), (-75.457073727, -113.482576588))
        make_face()
        with BuildLine():
            Line((-75.457073727, -109.482576588), (-30.457073727, -109.482576588))
            ThreePointArc((-30.457073727, -109.482576588), (-28.957073727, -110.982576588), (-30.457073727, -112.482576588))
            Line((-30.457073727, -112.482576588), (-75.457073727, -112.482576588))
            ThreePointArc((-75.457073727, -112.482576588), (-76.957073727, -110.982576588), (-75.457073727, -109.482576588))
        make_face()
        with BuildLine():
            Line((-75.457073727, -105.482576588), (-30.457073727, -105.482576588))
            ThreePointArc((-30.457073727, -105.482576588), (-28.957073727, -106.982576588), (-30.457073727, -108.482576588))
            Line((-30.457073727, -108.482576588), (-75.457073727, -108.482576588))
            ThreePointArc((-75.457073727, -108.482576588), (-76.957073727, -106.982576588), (-75.457073727, -105.482576588))
        make_face()
        with BuildLine():
            Line((-75.457073727, -101.482576588), (-30.457073727, -101.482576588))
            ThreePointArc((-30.457073727, -101.482576588), (-28.957073727, -102.982576588), (-30.457073727, -104.482576588))
            Line((-30.457073727, -104.482576588), (-75.457073727, -104.482576588))
            ThreePointArc((-75.457073727, -104.482576588), (-76.957073727, -102.982576588), (-75.457073727, -101.482576588))
        make_face()
        with BuildLine():
            Line((-75.457073727, -97.482576588), (-30.457073727, -97.482576588))
            ThreePointArc((-30.457073727, -97.482576588), (-28.957073727, -98.982576588), (-30.457073727, -100.482576588))
            Line((-30.457073727, -100.482576588), (-75.457073727, -100.482576588))
            ThreePointArc((-75.457073727, -100.482576588), (-76.957073727, -98.982576588), (-75.457073727, -97.482576588))
        make_face()
        with BuildLine():
            Line((-75.457073727, -93.482576588), (-30.457073727, -93.482576588))
            ThreePointArc((-30.457073727, -93.482576588), (-28.957073727, -94.982576588), (-30.457073727, -96.482576588))
            Line((-30.457073727, -96.482576588), (-75.457073727, -96.482576588))
            ThreePointArc((-75.457073727, -96.482576588), (-76.957073727, -94.982576588), (-75.457073727, -93.482576588))
        make_face()
        with BuildLine():
            Line((-75.457073727, -89.482576588), (-30.457073727, -89.482576588))
            ThreePointArc((-30.457073727, -89.482576588), (-28.957073727, -90.982576588), (-30.457073727, -92.482576588))
            Line((-30.457073727, -92.482576588), (-75.457073727, -92.482576588))
            ThreePointArc((-75.457073727, -92.482576588), (-76.957073727, -90.982576588), (-75.457073727, -89.482576588))
        make_face()
        with BuildLine():
            Line((-75.457073727, -85.482576588), (-30.457073727, -85.482576588))
            ThreePointArc((-30.457073727, -85.482576588), (-28.957073727, -86.982576588), (-30.457073727, -88.482576588))
            Line((-30.457073727, -88.482576588), (-75.457073727, -88.482576588))
            ThreePointArc((-75.457073727, -88.482576588), (-76.957073727, -86.982576588), (-75.457073727, -85.482576588))
        make_face()
    extrude(amount=-CUT_EXTRUDE_4_DEPTH, mode=Mode.SUBTRACT)

    # 草图6 → 切除-拉伸5 (cut, through all)
    with BuildSketch(Plane.XY.offset(5)):
        with Locations((-36.394269724, -246.799791484)):
            Circle(SKETCH_6_R)
        with Locations((142.308417178, -246.799791484)):
            Circle(SKETCH_6_R)
    extrude(amount=-CUT_EXTRUDE_5_DEPTH, mode=Mode.SUBTRACT)


solid = part.part
